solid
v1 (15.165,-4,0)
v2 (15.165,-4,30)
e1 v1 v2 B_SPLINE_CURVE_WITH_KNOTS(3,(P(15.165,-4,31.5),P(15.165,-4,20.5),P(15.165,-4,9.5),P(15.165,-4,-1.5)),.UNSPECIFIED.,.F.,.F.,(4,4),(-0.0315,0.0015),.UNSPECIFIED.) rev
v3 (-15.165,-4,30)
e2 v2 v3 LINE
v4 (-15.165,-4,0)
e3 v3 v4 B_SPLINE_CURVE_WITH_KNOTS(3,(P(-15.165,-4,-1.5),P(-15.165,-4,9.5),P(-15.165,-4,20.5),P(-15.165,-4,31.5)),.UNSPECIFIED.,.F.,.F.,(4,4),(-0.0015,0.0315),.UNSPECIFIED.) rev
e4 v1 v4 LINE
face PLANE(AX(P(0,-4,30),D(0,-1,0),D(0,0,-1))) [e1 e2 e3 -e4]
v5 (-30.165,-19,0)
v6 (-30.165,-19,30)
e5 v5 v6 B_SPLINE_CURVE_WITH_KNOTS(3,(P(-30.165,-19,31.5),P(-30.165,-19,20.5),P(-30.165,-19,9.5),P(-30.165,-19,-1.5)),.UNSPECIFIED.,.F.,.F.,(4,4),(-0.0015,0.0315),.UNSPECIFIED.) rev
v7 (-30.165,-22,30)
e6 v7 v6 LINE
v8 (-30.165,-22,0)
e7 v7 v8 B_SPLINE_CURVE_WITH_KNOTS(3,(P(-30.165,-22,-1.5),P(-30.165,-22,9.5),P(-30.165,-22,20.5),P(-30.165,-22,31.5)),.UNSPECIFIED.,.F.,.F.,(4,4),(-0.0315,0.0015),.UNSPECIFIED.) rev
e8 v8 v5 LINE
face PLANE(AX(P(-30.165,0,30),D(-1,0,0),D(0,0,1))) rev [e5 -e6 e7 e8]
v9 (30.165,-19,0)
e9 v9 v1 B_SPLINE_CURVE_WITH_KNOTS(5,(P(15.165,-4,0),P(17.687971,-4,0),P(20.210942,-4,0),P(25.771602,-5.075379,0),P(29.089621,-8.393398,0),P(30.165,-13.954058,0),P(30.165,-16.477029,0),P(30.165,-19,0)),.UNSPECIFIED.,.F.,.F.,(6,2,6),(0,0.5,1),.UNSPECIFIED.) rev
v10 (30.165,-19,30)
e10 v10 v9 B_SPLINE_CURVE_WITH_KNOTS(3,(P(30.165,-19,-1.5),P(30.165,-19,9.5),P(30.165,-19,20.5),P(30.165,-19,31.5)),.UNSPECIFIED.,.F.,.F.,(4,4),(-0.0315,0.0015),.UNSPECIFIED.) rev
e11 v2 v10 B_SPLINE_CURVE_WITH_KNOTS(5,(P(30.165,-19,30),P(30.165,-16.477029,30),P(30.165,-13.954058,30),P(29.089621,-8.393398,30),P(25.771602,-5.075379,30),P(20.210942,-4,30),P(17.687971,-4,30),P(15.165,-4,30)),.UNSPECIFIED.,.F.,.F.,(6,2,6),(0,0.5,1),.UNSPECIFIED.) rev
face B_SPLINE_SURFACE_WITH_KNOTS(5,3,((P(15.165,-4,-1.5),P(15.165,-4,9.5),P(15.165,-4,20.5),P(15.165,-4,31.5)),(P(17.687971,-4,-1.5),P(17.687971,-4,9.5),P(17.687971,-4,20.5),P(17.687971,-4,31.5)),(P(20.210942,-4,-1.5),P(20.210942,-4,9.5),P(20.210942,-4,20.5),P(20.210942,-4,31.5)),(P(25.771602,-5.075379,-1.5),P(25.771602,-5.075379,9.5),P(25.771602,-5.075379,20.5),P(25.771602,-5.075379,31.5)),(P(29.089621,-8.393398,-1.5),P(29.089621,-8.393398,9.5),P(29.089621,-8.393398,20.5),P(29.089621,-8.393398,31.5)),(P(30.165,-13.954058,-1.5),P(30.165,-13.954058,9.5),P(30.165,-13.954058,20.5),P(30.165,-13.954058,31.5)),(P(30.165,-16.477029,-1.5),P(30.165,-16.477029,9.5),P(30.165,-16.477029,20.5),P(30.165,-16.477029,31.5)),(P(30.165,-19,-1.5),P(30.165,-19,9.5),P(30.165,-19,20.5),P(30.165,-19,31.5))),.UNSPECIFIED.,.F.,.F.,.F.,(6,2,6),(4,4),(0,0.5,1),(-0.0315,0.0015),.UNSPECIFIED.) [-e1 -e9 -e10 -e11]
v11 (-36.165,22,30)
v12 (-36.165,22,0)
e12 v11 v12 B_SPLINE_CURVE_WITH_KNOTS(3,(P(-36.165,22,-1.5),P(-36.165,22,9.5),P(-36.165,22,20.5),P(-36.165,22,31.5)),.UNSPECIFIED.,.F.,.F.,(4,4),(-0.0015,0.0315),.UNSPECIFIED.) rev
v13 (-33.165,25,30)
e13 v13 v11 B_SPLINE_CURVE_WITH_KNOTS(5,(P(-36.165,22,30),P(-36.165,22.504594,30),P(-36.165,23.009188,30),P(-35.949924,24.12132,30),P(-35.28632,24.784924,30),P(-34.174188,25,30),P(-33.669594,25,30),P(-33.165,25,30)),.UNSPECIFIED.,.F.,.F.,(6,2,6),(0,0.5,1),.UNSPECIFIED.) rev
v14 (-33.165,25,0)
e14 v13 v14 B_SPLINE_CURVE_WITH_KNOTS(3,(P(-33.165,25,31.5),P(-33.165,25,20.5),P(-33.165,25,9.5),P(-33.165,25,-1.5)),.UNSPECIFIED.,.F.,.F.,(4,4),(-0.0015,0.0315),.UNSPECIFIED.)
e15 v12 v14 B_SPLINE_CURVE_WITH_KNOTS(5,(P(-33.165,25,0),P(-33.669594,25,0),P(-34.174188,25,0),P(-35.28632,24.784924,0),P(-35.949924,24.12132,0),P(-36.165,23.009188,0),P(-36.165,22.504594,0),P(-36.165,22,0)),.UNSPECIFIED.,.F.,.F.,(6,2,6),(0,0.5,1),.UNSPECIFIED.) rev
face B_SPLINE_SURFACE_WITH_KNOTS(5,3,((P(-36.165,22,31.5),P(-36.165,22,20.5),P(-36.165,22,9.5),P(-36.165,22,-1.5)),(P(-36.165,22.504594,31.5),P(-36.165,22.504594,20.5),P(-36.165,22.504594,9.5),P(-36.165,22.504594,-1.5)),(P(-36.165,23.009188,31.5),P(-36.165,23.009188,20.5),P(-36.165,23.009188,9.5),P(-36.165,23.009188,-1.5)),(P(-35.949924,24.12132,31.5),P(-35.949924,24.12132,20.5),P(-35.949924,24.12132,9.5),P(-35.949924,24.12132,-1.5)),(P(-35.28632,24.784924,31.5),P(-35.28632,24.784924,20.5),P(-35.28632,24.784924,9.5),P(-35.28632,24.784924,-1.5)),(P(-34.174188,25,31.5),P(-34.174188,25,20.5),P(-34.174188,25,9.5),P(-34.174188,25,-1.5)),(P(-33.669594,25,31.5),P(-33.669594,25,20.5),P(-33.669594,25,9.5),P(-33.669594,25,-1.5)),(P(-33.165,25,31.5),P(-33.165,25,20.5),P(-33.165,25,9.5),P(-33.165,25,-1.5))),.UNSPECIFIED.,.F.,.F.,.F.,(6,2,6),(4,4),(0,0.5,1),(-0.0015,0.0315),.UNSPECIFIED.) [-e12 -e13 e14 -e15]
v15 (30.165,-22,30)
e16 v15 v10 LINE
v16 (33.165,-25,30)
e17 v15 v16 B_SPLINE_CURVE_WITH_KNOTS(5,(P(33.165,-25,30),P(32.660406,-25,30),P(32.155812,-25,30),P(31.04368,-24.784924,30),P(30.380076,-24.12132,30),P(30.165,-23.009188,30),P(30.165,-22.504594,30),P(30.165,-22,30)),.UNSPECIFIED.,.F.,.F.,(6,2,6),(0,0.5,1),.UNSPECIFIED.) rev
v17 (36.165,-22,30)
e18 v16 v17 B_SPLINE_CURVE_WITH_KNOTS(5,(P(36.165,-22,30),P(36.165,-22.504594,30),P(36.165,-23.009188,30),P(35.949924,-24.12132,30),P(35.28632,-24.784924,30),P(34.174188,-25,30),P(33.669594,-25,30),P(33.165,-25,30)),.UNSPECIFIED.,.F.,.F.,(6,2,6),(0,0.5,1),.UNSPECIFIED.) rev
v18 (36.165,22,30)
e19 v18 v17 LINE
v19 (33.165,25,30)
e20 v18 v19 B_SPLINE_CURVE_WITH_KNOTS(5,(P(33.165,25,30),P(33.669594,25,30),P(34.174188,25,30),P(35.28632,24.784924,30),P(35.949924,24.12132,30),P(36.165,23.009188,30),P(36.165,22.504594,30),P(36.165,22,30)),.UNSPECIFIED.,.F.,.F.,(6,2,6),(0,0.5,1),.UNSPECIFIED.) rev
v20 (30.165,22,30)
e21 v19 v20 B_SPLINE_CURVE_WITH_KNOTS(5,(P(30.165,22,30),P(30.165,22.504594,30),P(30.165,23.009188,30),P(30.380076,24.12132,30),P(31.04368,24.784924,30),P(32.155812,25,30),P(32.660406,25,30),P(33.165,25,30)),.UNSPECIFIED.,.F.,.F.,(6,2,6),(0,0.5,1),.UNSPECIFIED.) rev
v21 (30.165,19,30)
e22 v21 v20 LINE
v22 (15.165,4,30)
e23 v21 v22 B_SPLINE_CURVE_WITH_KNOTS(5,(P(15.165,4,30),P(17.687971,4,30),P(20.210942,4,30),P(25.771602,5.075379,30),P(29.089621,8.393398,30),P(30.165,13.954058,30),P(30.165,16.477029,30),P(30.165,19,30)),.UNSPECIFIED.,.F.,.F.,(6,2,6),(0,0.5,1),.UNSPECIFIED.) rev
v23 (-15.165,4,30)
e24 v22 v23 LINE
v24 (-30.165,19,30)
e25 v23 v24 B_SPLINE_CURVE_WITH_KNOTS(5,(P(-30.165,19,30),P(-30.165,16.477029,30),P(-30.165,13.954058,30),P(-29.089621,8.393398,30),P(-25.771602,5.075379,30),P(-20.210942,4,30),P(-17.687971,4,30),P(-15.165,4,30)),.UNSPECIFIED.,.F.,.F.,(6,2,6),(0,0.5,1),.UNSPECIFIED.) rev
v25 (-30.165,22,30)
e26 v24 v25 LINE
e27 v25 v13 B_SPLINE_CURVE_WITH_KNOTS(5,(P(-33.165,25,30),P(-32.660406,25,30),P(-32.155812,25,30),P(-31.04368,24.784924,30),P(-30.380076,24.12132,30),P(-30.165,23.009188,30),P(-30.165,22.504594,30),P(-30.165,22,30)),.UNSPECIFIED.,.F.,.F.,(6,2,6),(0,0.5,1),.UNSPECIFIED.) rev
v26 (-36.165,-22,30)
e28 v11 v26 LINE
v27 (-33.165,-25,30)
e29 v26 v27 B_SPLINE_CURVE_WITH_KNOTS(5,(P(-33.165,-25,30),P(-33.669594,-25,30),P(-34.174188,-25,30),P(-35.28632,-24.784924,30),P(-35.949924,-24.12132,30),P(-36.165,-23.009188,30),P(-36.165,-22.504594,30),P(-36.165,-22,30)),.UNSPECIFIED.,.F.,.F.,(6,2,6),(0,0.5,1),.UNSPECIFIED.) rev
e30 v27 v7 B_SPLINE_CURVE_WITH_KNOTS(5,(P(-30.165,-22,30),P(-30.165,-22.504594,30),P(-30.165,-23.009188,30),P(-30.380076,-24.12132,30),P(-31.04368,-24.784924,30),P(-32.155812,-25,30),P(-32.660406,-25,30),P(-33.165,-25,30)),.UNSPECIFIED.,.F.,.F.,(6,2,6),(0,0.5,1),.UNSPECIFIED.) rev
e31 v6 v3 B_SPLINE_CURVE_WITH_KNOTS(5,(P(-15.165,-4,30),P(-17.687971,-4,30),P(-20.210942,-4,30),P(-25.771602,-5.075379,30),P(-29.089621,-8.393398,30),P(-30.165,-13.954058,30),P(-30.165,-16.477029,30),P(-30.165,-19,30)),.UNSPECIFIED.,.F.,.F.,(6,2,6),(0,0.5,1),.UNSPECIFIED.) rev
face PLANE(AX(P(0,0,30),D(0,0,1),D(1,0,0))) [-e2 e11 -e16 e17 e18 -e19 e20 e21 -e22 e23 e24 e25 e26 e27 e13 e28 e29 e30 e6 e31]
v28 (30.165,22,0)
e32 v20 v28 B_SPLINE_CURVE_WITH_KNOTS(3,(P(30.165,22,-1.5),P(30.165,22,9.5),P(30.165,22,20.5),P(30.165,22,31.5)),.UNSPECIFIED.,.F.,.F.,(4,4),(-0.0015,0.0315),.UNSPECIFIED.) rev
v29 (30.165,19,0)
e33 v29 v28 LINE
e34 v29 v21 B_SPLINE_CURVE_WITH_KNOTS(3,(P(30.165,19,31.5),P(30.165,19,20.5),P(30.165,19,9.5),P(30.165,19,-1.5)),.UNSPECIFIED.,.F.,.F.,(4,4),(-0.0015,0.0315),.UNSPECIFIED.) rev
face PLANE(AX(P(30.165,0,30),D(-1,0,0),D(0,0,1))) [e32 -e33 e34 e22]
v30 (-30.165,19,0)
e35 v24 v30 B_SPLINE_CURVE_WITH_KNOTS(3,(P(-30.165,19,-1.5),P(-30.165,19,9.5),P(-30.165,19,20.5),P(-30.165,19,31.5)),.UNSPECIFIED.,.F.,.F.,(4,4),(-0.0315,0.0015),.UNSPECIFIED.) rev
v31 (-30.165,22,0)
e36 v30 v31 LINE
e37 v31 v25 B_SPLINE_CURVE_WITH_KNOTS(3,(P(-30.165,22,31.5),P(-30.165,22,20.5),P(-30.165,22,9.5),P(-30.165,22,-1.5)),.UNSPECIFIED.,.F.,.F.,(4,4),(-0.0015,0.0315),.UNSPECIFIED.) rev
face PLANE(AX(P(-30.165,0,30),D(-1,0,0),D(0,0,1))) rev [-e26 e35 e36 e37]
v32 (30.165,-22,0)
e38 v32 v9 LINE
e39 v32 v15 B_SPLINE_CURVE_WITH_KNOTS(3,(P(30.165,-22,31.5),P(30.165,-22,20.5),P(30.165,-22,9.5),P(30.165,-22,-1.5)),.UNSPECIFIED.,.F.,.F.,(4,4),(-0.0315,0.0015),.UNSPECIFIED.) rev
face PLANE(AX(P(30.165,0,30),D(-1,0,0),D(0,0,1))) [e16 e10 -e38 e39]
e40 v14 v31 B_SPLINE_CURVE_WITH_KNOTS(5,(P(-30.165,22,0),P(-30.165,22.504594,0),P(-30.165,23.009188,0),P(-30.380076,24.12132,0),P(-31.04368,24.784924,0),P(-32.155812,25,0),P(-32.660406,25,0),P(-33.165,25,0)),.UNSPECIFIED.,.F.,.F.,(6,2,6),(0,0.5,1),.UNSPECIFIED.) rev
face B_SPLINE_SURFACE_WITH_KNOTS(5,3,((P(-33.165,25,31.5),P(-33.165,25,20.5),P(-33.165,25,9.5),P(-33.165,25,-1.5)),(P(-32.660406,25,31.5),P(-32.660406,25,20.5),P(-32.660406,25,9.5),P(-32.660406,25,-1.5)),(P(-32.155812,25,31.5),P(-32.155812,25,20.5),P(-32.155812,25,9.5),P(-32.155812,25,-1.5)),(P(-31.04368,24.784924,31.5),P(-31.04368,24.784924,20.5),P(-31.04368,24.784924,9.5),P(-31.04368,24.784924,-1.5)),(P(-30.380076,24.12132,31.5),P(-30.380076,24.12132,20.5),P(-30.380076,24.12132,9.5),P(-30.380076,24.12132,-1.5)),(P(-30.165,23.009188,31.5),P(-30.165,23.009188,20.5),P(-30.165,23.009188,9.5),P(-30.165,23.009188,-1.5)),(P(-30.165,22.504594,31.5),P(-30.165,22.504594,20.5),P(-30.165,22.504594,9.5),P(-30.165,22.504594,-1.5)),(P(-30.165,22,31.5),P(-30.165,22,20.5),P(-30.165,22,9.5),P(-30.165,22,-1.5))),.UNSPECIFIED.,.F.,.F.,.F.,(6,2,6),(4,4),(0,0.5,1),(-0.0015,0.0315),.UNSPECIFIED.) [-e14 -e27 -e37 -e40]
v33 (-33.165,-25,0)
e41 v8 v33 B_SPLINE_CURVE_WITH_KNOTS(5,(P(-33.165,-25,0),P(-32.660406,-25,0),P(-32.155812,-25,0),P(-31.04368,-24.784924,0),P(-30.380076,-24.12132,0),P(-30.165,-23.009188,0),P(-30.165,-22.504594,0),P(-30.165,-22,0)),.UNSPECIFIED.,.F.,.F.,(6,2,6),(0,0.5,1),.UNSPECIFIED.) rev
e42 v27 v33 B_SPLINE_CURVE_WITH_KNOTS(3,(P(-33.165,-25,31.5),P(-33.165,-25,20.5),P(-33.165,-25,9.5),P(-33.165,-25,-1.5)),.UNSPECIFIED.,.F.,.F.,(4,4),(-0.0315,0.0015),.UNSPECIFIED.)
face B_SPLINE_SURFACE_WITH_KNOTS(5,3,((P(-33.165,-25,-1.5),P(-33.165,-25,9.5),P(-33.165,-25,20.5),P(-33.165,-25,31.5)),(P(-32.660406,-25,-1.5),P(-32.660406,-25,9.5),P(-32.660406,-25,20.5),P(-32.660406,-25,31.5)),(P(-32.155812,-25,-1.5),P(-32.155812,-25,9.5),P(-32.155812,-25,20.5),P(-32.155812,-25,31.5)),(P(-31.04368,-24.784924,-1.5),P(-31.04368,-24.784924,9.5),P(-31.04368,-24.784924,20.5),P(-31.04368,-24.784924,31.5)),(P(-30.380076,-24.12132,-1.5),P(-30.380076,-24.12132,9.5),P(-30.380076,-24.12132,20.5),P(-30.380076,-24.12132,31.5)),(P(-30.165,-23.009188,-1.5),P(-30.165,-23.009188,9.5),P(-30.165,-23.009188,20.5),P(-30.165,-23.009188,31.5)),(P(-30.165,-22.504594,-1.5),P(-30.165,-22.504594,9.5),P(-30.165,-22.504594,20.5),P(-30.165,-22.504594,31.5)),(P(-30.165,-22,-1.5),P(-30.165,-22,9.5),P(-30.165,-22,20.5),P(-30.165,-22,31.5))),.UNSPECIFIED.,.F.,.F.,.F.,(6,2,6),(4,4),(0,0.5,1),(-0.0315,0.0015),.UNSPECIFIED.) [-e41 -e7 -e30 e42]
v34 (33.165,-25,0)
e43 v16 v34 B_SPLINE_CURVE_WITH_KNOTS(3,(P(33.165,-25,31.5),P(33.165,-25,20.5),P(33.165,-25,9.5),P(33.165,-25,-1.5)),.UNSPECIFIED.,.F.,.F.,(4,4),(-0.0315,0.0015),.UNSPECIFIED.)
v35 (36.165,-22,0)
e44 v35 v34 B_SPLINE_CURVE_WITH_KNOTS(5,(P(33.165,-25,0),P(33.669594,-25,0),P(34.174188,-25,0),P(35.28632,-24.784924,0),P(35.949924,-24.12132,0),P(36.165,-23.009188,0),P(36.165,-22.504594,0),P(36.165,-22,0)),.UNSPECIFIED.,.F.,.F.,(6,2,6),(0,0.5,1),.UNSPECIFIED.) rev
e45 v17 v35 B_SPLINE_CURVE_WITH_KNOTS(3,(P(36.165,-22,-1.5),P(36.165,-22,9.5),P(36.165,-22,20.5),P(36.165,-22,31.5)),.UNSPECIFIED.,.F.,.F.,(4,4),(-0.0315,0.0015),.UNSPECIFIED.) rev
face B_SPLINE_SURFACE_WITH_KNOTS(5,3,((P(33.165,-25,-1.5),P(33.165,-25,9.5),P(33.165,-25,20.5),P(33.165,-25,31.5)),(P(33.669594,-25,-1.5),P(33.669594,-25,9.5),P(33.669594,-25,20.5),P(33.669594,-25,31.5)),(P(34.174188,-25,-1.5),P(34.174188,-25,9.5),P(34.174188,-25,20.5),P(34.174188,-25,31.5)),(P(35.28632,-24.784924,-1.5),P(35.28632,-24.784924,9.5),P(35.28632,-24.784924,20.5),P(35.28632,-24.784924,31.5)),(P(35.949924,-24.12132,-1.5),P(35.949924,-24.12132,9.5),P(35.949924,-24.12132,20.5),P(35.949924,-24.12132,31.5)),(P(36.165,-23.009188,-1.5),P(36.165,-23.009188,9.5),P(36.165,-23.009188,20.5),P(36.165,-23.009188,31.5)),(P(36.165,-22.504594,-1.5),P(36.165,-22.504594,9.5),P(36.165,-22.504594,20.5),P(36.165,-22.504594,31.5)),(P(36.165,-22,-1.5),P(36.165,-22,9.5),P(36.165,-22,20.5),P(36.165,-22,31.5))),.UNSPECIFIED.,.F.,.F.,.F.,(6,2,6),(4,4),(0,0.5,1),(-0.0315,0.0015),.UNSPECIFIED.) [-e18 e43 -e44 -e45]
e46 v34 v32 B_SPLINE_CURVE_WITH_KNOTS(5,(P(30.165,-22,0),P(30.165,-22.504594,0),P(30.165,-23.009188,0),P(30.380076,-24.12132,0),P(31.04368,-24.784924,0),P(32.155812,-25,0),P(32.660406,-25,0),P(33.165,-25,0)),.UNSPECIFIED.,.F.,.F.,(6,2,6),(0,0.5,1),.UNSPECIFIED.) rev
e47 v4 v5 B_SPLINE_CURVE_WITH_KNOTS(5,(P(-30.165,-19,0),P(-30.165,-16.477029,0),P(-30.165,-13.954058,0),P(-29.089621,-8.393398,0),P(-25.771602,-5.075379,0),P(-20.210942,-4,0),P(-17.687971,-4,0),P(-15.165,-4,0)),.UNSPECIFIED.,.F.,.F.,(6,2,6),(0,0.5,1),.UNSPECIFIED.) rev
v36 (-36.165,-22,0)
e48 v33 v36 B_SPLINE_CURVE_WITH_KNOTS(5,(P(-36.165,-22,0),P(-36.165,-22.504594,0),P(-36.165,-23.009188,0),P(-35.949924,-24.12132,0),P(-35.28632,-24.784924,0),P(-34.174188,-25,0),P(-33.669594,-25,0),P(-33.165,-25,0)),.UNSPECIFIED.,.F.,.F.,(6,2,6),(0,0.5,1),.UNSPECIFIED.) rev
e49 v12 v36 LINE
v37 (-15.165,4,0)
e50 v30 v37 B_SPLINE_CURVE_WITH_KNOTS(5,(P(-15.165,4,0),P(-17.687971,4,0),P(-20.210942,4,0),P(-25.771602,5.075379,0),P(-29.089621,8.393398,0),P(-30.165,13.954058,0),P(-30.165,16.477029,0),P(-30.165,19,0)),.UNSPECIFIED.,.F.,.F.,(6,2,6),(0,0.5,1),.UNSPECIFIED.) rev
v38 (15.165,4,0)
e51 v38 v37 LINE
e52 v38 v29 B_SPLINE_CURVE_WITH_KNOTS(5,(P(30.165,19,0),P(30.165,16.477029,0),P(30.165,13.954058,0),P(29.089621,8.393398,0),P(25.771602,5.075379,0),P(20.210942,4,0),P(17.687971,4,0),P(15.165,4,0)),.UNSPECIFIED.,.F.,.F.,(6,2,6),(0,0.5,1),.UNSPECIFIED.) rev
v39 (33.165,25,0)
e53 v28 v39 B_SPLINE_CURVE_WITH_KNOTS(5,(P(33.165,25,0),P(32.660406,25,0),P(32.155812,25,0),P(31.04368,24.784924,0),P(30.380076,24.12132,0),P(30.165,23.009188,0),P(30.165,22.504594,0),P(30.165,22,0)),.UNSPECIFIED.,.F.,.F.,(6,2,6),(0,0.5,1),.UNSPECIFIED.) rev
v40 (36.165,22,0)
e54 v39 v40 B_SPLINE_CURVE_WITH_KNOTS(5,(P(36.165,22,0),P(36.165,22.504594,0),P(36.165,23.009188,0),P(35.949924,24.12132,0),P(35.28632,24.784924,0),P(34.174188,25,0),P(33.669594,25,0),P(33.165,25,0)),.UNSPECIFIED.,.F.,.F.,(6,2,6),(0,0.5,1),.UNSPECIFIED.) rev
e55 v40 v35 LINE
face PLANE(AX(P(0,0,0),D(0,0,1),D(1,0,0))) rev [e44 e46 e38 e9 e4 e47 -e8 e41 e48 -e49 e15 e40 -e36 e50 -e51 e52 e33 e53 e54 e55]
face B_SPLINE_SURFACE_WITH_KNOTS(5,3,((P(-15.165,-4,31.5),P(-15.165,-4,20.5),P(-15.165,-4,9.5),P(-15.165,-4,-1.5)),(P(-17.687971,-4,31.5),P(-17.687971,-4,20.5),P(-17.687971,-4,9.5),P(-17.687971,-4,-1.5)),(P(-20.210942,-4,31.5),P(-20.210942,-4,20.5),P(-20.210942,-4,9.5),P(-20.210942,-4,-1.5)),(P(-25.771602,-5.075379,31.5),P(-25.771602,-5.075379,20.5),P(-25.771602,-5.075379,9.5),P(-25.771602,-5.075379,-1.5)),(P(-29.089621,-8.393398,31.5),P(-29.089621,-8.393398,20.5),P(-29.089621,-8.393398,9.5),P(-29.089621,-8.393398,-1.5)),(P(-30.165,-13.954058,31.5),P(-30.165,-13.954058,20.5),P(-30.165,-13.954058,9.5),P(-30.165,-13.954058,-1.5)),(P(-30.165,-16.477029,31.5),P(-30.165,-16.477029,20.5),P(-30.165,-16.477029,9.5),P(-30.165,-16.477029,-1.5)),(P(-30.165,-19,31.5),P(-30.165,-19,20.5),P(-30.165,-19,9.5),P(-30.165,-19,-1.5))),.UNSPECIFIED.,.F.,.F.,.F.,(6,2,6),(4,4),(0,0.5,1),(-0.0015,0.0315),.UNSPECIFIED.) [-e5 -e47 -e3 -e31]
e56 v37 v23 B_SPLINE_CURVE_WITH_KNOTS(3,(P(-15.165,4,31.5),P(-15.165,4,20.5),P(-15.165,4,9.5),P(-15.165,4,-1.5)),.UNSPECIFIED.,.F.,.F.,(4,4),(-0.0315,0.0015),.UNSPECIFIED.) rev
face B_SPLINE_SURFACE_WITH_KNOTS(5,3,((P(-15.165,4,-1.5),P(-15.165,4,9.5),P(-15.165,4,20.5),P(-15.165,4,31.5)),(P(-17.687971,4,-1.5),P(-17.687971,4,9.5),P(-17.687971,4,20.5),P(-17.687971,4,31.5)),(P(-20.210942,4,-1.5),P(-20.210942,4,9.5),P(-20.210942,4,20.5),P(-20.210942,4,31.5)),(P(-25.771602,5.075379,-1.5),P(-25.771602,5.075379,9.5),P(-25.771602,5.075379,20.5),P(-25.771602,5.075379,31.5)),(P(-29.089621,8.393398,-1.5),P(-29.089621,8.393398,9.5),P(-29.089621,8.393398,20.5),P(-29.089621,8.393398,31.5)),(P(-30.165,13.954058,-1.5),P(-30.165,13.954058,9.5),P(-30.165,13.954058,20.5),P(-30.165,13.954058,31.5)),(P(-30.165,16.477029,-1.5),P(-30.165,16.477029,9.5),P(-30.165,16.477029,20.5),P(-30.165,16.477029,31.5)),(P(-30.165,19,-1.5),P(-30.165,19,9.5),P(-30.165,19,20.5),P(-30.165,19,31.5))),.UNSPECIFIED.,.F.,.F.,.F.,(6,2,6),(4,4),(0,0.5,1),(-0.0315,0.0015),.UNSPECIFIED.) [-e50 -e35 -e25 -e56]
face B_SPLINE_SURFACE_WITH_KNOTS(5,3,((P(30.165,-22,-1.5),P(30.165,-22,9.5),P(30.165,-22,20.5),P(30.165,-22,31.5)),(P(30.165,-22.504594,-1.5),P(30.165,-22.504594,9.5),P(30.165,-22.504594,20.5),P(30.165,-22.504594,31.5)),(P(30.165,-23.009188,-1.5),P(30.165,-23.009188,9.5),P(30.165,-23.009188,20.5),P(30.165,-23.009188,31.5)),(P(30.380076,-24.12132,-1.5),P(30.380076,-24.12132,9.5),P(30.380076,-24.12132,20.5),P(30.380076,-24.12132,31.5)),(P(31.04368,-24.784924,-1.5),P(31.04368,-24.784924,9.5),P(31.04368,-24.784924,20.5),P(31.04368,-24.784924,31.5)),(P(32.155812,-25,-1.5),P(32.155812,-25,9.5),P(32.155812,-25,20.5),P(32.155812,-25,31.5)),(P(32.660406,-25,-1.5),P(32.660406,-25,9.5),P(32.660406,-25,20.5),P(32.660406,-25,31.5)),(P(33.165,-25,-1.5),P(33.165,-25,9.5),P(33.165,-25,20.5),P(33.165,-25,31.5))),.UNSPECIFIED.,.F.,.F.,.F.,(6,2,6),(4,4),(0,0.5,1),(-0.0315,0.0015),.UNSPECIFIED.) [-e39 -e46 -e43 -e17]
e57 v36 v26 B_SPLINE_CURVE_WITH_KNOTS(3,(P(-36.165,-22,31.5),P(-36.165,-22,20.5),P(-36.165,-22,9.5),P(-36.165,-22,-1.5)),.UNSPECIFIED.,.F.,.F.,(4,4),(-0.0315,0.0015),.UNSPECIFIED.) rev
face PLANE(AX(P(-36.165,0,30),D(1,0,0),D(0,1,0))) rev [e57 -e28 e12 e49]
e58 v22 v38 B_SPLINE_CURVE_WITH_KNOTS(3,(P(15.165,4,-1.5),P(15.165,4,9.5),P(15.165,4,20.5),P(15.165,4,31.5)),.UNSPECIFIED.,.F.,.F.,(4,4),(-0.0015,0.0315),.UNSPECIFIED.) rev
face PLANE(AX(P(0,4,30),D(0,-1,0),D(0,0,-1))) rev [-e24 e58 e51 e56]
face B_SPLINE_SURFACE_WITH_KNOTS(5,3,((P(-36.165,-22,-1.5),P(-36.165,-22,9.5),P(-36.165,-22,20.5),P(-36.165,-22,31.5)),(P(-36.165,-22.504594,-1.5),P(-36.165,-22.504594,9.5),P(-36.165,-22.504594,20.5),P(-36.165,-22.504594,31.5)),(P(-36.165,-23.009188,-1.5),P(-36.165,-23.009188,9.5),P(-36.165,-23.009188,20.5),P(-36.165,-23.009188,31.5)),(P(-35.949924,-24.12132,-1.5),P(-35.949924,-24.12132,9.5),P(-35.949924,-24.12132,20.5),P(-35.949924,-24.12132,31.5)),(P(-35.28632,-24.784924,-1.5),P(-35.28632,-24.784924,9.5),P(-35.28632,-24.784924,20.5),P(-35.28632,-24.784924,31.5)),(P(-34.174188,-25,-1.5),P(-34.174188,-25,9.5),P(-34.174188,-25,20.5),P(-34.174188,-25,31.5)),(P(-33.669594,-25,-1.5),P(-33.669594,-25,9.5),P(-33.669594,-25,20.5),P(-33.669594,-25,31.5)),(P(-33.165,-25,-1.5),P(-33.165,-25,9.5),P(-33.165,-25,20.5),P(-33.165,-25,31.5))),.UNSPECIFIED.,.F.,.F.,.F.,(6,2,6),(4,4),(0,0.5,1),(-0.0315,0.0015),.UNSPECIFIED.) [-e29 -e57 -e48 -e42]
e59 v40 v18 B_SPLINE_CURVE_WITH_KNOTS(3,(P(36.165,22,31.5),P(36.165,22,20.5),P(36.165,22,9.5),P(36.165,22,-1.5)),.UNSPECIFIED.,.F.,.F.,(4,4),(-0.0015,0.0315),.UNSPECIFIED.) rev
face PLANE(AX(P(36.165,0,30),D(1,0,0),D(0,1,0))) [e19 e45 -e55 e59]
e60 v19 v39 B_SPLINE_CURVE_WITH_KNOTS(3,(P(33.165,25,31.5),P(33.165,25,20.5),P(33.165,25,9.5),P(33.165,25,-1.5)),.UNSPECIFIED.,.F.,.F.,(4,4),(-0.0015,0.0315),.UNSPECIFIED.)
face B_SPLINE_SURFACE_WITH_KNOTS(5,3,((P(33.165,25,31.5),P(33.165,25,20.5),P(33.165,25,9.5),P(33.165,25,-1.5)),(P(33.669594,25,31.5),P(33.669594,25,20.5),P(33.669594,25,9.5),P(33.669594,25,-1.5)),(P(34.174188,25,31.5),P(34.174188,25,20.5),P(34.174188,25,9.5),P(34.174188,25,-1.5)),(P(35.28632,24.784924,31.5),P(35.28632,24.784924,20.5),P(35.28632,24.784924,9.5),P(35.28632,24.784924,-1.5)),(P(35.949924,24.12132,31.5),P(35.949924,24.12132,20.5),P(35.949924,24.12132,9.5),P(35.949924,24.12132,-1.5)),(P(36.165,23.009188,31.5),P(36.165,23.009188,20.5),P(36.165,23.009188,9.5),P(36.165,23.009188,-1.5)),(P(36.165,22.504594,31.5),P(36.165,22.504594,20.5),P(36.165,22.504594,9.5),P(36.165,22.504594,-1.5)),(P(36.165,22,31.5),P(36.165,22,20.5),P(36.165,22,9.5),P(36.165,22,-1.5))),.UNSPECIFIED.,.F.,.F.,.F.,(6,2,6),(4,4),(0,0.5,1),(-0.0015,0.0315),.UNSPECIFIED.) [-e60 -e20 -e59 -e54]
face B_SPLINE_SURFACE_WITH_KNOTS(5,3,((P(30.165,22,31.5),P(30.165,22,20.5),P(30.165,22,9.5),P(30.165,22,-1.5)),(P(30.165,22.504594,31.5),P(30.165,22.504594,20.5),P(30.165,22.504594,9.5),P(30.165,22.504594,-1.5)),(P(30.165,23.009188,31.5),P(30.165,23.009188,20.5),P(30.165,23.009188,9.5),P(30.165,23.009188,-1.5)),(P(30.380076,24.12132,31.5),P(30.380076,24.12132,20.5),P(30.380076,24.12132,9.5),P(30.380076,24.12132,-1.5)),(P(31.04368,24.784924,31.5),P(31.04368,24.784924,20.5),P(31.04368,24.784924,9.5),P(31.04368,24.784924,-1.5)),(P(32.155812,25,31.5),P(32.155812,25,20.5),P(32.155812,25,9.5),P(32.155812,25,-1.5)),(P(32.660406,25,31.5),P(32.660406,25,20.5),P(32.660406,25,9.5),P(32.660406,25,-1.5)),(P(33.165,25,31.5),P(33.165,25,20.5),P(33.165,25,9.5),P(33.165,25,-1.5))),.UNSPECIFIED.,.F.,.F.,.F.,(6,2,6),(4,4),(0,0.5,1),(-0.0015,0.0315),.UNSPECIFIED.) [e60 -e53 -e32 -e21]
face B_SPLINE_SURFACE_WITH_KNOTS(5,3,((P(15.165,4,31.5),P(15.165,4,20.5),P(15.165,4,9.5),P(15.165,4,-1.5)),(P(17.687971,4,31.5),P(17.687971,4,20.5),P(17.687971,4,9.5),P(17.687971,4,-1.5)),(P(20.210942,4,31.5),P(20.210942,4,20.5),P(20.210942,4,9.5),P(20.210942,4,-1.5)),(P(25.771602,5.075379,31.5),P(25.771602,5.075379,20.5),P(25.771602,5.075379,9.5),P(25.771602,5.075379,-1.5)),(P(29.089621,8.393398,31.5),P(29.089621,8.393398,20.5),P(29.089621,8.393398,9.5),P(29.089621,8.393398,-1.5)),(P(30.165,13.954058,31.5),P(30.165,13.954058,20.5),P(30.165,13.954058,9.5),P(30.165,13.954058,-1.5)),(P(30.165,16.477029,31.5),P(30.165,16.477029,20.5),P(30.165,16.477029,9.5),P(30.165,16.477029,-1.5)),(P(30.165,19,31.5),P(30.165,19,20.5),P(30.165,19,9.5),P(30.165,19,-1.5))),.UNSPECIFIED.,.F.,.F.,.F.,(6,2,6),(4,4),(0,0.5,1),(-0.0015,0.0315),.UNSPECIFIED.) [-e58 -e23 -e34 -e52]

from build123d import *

# Parameters (mm, degrees)
SKETCH1_W           = 60.33
SKETCH1_H           = 4
BOSS_EXTRUDE1_DEPTH = 30
FILLET1_SIZE        = 15
FILLET2_SIZE        = 3


with BuildPart() as part:
    # Sketch1 → Boss-Extrude1 (new body)
    with BuildSketch(Plane.XY):
        Polygon((-36.165, 0), (-30.165, 0), (-30.165, 4), (-30.165, 25), (-36.165, 25), align=None)
        Polygon((-30.165, -4), (-30.165, 0), (-36.165, 0), (-36.165, -25), (-30.165, -25), align=None)
        with Locations((0, -2)):
            Rectangle(SKETCH1_W, SKETCH1_H)
        with Locations((0, 2)):
            Rectangle(SKETCH1_W, SKETCH1_H)
        Polygon((30.165, 0), (36.165, 0), (36.165, 25), (30.165, 25), (30.165, 4), align=None)
        Polygon((36.165, -25), (36.165, 0), (30.165, 0), (30.165, -4), (30.165, -25), align=None)
    extrude(amount=BOSS_EXTRUDE1_DEPTH)

    # Fillet1
    # a fillet whose section is not a circle: 15 mm, written as the material it adds along each edge
    with BuildSketch(Plane(origin=(30.165, -4, 0), x_dir=(0, -1, 0), z_dir=(0, 0, 1)), Plane(origin=(30.165, 4, 0), x_dir=(-1, 0, 0), z_dir=(0, 0, 1)), Plane(origin=(-30.165, -4, 0), x_dir=(1, 0, 0), z_dir=(0, 0, 1))) as fillet1_piece_1:
        with BuildLine():
            add(Edge.make_bspline([(FILLET1_SIZE, 0), (FILLET1_SIZE * 0.831801948466, 0), (FILLET1_SIZE * 0.663603896932, 0), (FILLET1_SIZE * 0.292893218813, -FILLET1_SIZE * 0.0716919198361), (FILLET1_SIZE * 0.0716919198361, -FILLET1_SIZE * 0.292893218813), (0, -FILLET1_SIZE * 0.663603896932), (0, -FILLET1_SIZE * 0.831801948466), (0, -FILLET1_SIZE)], knots=[0, 0, 0, 0, 0, 0, 0.5, 0.5, 1, 1, 1, 1, 1, 1], degree=5))
            Line((0, -FILLET1_SIZE), (-FILLET1_SIZE * 0.02, -FILLET1_SIZE))
            Line((-FILLET1_SIZE * 0.02, -FILLET1_SIZE), (-FILLET1_SIZE * 0.02, FILLET1_SIZE * 0.02))
            Line((-FILLET1_SIZE * 0.02, FILLET1_SIZE * 0.02), (FILLET1_SIZE, FILLET1_SIZE * 0.02))
            Line((FILLET1_SIZE, FILLET1_SIZE * 0.02), (FILLET1_SIZE, 0))
        make_face()
    extrude(amount=30)
    with BuildSketch(Plane(origin=(-30.165, 4, 0), x_dir=(1, 0, 0), z_dir=(0, 0, 1))) as fillet1_piece_2:
        with BuildLine():
            add(Edge.make_bspline([(FILLET1_SIZE, 0), (FILLET1_SIZE * 0.831801948466, 0), (FILLET1_SIZE * 0.663603896932, 0), (FILLET1_SIZE * 0.292893218813, FILLET1_SIZE * 0.0716919198361), (FILLET1_SIZE * 0.0716919198361, FILLET1_SIZE * 0.292893218813), (0, FILLET1_SIZE * 0.663603896932), (0, FILLET1_SIZE * 0.831801948466), (0, FILLET1_SIZE)], knots=[0, 0, 0, 0, 0, 0, 0.5, 0.5, 1, 1, 1, 1, 1, 1], degree=5))
            Line((0, FILLET1_SIZE), (-FILLET1_SIZE * 0.02, FILLET1_SIZE))
            Line((-FILLET1_SIZE * 0.02, FILLET1_SIZE), (-FILLET1_SIZE * 0.02, -FILLET1_SIZE * 0.02))
            Line((-FILLET1_SIZE * 0.02, -FILLET1_SIZE * 0.02), (FILLET1_SIZE, -FILLET1_SIZE * 0.02))
            Line((FILLET1_SIZE, -FILLET1_SIZE * 0.02), (FILLET1_SIZE, 0))
        make_face()
    extrude(amount=30)

    # Fillet2
    # a fillet whose section is not a circle: 3 mm, written as the material it takes off along each edge
    with BuildSketch(Plane(origin=(30.165, 25, -7.5), x_dir=(1, 0, 0), z_dir=(0, 0, 1)), Plane(origin=(36.165, 25, -7.5), x_dir=(0, -1, 0), z_dir=(0, 0, 1)), Plane(origin=(36.165, -25, -7.5), x_dir=(-1, 0, 0), z_dir=(0, 0, 1)), Plane(origin=(30.165, -25, -7.5), x_dir=(0, 1, 0), z_dir=(0, 0, 1)), Plane(origin=(-30.165, -25, -7.5), x_dir=(-1, 0, 0), z_dir=(0, 0, 1)), Plane(origin=(-36.165, -25, -7.5), x_dir=(0, 1, 0), z_dir=(0, 0, 1)), Plane(origin=(-36.165, 25, -7.5), x_dir=(1, 0, 0), z_dir=(0, 0, 1)), Plane(origin=(-30.165, 25, -7.5), x_dir=(0, -1, 0), z_dir=(0, 0, 1))) as fillet2_piece_1:
        with BuildLine():
            add(Edge.make_bspline([(FILLET2_SIZE, 0), (FILLET2_SIZE * 0.831801948466, 0), (FILLET2_SIZE * 0.663603896932, 0), (FILLET2_SIZE * 0.292893218813, -FILLET2_SIZE * 0.0716919198361), (FILLET2_SIZE * 0.0716919198361, -FILLET2_SIZE * 0.292893218813), (0, -FILLET2_SIZE * 0.663603896932), (0, -FILLET2_SIZE * 0.831801948466), (0, -FILLET2_SIZE)], knots=[0, 0, 0, 0, 0, 0, 0.5, 0.5, 1, 1, 1, 1, 1, 1], degree=5))
            Line((0, -FILLET2_SIZE), (0, 0))
            Line((0, 0), (FILLET2_SIZE, 0))
        make_face()
    extrude(amount=45, mode=Mode.SUBTRACT)


solid = part.part
